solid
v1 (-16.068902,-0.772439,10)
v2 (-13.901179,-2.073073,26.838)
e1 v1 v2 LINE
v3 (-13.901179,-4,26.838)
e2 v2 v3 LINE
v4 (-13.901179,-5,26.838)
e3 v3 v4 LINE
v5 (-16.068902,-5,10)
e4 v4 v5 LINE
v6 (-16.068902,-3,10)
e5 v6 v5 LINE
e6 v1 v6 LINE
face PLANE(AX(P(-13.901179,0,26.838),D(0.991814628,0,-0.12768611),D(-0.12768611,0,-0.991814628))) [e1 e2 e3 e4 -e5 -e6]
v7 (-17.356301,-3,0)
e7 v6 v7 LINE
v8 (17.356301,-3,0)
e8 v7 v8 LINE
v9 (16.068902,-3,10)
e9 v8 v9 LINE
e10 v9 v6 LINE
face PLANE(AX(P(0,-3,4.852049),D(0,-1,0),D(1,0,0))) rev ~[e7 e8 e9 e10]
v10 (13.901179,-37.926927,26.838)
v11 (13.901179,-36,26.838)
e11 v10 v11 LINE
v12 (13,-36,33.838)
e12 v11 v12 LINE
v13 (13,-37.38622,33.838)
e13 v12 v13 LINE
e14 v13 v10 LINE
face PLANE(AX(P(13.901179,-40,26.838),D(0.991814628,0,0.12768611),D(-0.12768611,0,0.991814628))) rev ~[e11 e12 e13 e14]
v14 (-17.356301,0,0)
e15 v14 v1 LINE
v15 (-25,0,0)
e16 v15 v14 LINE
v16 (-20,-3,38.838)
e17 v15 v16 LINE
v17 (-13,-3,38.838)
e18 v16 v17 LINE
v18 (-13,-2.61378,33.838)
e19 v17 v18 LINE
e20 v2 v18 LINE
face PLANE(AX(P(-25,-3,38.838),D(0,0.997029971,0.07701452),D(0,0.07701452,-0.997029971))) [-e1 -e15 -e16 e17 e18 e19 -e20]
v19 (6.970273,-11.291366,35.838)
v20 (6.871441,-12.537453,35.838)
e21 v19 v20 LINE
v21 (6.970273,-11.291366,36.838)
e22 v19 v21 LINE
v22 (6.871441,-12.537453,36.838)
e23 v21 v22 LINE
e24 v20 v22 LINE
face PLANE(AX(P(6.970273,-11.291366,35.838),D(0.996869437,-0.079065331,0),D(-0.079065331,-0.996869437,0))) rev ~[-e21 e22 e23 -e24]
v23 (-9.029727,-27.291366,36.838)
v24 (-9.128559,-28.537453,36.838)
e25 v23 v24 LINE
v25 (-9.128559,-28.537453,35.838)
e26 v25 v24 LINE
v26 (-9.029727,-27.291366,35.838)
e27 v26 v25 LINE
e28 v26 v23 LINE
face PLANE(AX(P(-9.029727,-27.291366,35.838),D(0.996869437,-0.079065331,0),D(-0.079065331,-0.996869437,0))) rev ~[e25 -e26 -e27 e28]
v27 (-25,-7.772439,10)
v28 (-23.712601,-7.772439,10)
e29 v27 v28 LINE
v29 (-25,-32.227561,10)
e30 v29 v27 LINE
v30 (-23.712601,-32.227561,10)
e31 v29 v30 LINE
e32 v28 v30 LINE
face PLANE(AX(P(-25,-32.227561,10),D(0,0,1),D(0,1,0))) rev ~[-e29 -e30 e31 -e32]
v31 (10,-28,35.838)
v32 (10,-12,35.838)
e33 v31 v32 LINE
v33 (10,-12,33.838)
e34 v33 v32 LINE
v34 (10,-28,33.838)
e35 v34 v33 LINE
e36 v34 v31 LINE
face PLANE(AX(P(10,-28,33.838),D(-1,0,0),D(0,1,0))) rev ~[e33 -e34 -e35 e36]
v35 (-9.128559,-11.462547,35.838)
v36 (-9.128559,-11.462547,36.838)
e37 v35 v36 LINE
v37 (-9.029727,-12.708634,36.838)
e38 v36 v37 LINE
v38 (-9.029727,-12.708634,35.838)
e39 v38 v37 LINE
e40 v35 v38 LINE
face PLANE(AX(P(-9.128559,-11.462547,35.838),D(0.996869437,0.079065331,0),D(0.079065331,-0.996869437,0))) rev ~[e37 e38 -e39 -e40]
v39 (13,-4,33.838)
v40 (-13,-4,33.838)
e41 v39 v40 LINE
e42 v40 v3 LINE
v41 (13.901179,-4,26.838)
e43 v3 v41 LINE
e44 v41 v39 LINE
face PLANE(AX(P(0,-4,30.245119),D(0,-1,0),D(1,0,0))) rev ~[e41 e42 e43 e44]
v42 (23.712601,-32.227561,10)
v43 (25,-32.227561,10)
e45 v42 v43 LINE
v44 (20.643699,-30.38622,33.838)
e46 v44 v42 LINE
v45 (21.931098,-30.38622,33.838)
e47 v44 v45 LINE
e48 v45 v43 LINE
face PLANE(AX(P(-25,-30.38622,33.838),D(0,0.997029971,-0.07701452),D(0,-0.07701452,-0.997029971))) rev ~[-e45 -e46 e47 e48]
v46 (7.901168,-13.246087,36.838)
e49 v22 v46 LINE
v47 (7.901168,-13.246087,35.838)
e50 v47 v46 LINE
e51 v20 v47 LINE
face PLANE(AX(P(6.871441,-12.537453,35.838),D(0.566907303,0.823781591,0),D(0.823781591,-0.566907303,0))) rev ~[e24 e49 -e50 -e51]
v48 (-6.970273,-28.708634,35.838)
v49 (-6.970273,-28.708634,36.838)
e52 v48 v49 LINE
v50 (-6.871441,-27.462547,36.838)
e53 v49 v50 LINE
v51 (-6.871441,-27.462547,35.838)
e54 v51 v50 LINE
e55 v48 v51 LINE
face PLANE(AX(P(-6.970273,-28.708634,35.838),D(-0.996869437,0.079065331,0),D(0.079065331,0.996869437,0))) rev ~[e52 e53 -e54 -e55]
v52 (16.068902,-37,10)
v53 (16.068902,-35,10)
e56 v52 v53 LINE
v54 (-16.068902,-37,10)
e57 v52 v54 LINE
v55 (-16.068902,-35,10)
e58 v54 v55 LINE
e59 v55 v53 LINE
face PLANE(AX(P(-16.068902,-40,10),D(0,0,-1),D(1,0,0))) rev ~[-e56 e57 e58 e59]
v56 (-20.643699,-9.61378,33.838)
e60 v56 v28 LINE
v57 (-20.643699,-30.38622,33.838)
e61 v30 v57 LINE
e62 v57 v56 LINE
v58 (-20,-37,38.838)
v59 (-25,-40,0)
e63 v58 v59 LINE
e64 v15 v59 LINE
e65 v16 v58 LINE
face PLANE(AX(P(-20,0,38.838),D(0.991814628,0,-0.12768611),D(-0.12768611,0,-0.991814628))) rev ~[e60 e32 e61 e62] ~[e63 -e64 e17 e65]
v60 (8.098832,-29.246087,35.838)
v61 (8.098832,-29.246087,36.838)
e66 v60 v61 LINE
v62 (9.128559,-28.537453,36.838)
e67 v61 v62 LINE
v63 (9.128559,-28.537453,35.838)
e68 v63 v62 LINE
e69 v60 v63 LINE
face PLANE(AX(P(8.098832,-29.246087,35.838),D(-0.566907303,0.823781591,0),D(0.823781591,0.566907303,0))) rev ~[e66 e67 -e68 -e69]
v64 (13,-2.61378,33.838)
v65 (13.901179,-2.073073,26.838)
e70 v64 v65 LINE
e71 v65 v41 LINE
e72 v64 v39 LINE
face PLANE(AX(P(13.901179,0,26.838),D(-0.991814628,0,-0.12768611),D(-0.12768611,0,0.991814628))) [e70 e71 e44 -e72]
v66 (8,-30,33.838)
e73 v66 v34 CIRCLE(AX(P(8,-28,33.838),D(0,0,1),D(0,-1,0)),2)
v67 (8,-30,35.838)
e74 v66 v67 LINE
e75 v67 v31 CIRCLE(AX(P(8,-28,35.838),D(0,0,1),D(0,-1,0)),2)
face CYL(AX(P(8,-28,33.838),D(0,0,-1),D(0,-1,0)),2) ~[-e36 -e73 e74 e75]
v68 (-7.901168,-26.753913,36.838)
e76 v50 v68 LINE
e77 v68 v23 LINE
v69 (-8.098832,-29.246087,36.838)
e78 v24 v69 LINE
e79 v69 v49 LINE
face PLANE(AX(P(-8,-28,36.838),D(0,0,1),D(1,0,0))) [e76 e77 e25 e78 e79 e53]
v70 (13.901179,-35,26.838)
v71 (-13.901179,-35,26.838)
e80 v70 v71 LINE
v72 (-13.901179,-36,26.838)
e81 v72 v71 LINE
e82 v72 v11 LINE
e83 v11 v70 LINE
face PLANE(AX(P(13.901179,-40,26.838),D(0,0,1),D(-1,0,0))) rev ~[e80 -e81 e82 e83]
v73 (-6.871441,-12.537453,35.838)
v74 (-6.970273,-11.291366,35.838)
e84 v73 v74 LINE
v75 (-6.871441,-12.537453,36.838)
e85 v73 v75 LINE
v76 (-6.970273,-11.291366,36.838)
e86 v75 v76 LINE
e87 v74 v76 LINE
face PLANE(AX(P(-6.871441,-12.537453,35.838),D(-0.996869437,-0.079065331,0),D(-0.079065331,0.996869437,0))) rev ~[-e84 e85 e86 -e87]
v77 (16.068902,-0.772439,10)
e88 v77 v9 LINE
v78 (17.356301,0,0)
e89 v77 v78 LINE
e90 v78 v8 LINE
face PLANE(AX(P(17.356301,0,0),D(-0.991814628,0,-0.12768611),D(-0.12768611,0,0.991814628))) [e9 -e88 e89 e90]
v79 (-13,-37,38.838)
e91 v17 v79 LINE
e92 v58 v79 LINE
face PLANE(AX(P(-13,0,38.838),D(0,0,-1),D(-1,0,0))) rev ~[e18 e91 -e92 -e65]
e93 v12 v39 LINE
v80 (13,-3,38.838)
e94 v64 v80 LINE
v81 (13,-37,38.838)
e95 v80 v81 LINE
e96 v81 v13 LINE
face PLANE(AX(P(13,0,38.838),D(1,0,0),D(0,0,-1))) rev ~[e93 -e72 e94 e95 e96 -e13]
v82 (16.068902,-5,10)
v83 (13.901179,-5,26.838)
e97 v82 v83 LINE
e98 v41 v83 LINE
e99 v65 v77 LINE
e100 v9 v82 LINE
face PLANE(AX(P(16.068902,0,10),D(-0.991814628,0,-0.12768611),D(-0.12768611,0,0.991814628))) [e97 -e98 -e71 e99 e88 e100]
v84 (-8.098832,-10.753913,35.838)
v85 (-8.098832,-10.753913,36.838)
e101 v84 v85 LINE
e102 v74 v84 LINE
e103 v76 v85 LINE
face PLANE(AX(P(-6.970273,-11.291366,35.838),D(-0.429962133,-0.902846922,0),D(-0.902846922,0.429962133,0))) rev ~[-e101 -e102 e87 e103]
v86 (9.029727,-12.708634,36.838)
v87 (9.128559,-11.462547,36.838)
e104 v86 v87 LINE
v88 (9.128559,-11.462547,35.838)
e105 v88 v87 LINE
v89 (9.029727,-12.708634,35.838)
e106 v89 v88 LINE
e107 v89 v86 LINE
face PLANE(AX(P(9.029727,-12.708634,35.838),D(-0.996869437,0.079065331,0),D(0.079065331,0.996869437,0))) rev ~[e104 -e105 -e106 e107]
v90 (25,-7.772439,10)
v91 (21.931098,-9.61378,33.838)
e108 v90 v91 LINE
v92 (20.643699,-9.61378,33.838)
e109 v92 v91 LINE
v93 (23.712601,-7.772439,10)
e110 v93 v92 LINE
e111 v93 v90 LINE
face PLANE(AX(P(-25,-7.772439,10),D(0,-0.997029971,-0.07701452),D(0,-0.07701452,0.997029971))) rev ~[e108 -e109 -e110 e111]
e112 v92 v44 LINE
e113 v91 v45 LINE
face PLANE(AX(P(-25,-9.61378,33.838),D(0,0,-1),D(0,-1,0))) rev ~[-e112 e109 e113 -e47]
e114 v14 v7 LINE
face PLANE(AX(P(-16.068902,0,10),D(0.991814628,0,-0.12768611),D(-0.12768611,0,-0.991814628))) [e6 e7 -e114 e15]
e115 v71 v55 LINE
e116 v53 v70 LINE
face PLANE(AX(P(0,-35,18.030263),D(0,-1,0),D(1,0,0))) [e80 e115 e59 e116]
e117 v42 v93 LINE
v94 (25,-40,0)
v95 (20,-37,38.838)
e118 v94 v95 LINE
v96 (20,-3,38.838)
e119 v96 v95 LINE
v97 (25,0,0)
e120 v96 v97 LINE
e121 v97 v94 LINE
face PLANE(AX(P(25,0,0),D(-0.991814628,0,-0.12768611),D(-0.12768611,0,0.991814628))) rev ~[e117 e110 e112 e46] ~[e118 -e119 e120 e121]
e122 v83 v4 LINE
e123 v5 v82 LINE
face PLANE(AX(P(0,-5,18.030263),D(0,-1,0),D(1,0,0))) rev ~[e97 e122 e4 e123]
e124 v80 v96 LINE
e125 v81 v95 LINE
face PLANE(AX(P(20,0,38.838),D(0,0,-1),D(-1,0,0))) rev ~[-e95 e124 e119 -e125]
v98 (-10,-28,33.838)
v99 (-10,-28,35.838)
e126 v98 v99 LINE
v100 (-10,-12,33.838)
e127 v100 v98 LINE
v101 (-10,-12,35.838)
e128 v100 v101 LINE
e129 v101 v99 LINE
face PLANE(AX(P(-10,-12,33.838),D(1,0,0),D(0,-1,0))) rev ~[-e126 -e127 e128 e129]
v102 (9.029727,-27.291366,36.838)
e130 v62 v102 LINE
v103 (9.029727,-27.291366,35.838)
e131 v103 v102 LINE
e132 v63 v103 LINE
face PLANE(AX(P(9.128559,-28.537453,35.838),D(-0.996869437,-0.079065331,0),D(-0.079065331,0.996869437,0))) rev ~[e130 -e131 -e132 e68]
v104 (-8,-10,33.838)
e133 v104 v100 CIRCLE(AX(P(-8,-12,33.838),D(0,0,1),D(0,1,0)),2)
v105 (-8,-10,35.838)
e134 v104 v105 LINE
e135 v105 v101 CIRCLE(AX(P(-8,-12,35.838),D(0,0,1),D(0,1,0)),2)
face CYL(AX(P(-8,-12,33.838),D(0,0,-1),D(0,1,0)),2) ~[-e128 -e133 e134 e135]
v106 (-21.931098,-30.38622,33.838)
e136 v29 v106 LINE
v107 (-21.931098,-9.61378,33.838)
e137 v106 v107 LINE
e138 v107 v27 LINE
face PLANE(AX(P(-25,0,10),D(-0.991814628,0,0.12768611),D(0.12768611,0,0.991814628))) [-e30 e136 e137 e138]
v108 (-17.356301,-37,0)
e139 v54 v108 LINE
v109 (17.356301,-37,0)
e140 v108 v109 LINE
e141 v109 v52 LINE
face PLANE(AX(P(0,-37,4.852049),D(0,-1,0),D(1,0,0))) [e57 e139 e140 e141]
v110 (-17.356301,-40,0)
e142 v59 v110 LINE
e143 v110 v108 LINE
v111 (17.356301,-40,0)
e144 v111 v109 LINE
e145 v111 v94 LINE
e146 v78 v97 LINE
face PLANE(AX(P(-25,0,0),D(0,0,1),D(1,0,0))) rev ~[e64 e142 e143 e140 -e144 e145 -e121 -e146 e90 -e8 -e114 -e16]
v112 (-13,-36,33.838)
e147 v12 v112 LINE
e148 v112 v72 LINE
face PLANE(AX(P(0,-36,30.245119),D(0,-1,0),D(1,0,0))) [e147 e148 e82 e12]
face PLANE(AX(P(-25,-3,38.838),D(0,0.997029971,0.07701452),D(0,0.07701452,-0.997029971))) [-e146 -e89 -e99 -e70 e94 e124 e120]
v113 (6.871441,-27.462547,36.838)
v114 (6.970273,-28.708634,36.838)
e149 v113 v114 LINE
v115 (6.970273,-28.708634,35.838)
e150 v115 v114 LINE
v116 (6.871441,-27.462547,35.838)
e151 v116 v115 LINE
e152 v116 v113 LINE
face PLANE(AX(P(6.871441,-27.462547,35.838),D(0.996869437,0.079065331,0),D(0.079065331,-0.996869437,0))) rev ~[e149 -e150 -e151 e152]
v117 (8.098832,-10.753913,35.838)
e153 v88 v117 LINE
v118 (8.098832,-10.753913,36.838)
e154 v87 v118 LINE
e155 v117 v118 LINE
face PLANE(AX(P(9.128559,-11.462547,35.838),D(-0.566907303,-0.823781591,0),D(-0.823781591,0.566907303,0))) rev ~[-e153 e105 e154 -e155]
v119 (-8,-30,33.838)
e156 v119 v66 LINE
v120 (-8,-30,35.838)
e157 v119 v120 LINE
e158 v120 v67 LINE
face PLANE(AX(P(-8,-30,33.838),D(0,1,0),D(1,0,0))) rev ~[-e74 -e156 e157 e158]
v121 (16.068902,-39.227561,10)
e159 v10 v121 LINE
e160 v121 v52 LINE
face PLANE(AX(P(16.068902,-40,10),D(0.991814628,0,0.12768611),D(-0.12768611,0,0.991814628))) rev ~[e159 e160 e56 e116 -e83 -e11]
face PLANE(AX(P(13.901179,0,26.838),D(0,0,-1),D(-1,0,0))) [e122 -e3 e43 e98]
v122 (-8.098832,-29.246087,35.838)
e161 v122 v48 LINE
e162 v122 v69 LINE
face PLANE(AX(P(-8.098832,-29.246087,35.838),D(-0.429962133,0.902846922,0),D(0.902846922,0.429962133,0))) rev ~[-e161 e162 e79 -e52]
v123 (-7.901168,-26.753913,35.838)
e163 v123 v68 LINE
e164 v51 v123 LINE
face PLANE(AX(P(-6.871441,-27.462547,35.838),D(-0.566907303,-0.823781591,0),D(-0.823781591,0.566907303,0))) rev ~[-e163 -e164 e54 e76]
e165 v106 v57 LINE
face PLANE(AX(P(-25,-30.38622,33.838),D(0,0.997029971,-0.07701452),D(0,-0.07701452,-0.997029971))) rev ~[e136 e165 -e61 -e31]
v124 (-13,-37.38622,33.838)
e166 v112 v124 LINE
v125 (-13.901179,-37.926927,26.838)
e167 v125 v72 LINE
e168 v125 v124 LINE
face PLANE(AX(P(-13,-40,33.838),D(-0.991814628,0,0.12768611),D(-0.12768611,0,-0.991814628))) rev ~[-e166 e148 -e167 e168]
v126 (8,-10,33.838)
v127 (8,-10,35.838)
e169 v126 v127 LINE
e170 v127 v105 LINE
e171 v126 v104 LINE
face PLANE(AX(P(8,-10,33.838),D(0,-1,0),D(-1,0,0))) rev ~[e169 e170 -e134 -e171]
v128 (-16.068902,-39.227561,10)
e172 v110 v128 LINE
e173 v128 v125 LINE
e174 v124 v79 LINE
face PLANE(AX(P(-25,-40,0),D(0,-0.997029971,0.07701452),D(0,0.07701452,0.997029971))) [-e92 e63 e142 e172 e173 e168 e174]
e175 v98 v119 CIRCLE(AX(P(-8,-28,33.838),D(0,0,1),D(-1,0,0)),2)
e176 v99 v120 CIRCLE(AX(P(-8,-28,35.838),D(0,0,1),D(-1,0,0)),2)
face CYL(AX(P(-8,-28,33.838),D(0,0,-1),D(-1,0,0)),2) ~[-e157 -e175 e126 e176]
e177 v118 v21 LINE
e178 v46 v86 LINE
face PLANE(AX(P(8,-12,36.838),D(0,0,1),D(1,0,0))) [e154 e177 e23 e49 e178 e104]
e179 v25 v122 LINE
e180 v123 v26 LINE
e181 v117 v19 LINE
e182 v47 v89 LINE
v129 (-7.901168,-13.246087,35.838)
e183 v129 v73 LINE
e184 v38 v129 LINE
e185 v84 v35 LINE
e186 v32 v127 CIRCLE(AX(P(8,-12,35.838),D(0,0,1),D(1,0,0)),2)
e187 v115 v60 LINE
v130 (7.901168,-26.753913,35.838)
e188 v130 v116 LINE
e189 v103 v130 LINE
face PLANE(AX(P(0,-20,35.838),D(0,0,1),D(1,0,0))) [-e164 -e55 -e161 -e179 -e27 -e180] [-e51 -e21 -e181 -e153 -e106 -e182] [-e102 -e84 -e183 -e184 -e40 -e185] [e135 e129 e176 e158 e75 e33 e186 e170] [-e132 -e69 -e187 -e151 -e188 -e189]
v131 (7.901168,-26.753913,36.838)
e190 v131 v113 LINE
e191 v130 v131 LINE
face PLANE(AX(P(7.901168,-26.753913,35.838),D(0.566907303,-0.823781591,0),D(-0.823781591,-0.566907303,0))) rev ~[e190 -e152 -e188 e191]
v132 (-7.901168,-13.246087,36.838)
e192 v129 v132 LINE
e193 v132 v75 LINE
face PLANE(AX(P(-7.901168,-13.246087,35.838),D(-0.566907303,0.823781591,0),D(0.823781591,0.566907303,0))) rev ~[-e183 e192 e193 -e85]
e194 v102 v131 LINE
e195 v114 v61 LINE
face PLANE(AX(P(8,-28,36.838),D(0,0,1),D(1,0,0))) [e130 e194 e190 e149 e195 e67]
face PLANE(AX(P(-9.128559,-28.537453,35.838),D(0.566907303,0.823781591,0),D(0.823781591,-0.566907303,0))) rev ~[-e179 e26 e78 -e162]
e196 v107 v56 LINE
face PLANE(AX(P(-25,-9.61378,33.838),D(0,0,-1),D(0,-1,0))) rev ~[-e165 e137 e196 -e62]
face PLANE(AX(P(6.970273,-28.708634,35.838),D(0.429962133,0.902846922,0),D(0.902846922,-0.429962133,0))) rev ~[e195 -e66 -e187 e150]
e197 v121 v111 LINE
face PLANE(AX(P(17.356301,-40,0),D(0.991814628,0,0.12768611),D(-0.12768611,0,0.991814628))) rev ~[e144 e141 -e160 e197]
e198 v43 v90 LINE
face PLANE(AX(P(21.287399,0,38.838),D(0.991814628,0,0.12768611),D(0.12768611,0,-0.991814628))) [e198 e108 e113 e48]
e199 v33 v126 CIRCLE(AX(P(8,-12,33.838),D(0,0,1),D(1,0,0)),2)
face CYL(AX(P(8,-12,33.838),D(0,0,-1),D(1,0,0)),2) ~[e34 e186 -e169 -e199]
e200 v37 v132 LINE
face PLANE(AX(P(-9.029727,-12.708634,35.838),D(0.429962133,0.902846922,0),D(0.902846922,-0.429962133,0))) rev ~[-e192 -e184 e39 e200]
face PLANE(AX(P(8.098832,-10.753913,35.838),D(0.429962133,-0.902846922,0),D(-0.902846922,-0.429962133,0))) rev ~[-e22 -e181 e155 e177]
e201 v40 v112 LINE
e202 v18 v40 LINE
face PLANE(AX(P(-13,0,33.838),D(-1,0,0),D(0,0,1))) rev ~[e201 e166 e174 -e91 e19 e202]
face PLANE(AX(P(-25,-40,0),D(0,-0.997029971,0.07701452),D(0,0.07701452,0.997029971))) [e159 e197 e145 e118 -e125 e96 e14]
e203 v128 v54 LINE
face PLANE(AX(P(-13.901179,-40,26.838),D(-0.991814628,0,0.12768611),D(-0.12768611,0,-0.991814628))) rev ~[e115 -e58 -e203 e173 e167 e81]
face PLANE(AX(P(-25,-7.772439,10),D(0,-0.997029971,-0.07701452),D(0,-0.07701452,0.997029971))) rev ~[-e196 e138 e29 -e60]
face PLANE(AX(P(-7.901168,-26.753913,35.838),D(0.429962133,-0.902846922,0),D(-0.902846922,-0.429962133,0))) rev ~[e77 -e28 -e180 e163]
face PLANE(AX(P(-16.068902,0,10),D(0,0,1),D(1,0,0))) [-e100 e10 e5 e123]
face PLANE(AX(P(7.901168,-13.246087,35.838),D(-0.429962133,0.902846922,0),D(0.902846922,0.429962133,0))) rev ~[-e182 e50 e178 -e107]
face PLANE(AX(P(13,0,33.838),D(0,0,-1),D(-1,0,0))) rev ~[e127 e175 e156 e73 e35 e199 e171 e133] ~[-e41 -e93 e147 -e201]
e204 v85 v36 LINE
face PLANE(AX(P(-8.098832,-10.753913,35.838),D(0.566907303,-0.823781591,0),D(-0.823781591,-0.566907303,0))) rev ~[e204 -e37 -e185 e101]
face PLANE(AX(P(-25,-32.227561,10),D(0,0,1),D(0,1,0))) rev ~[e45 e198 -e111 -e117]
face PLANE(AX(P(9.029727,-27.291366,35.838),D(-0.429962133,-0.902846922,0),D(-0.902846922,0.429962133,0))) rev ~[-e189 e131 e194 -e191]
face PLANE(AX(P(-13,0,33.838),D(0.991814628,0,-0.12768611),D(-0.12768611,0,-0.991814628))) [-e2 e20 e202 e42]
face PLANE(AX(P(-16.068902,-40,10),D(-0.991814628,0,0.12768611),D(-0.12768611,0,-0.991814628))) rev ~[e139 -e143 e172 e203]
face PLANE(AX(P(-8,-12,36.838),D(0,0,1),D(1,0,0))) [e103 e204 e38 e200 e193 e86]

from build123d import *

# Parameters (mm, degrees)
F1_DEPTH  = 40
F2_DEPTH  = 4
F3_DEPTH  = 3
F4_DEPTH  = 5
F6_DEPTH  = 4
F7_DEPTH  = 3
F8_DEPTH  = 5
F10_DEPTH = 2
F13_DEPTH = 50
F15_DEPTH = 1
F16_DEPTH = 50
F17_DEPTH = 40


# Not quite as in the source:
# - ends of sketch curves that miss each other by under 0.0002 mm in the source are joined


with BuildPart() as f1:
    # F0 (on Front) → F1 (new body)
    with BuildSketch(Plane.XZ):
        Polygon((-20, 38.838), (-25, 0), (-17.3563005304, 0), (-16.0689015912, 10), (-13.9011792574, 26.838), (-13, 33.838), (-13, 38.838), align=None)
        Polygon((-16.0689015912, 10), (-17.3563005304, 0), (17.3563005304, 0), (16.0689015912, 10), (0, 10), align=None)
        Polygon((-13.9011792574, 26.838), (-16.0689015912, 10), (0, 10), (16.0689015912, 10), (13.9011792574, 26.838), (-3.37943e-05, 26.838), align=None)
        Polygon((-13, 33.838), (-13.9011792574, 26.838), (3.37943e-05, 26.838), (13.9011792574, 26.838), (13, 33.838), (0, 33.838), align=None)
        Polygon((16.0689015912, 10), (17.3563005304, 0), (25, 0), (20, 38.838), (13, 38.838), (13, 33.838), (13.9011792574, 26.838), align=None)
    extrude(amount=F1_DEPTH)

    # F0 (on Front) → F2 (cut)
    with BuildSketch(Plane.XZ):
        Polygon((-13, 33.838), (-13.9011792574, 26.838), (3.37943e-05, 26.838), (13.9011792574, 26.838), (13, 33.838), (0, 33.838), align=None)
    extrude(amount=F2_DEPTH, mode=Mode.SUBTRACT)

    # F0 (on Front) → F3 (cut)
    with BuildSketch(Plane.XZ):
        Polygon((-16.0689015912, 10), (-17.3563005304, 0), (17.3563005304, 0), (16.0689015912, 10), (0, 10), align=None)
    extrude(amount=F3_DEPTH, mode=Mode.SUBTRACT)

    # F0 (on Front) → F4 (cut)
    with BuildSketch(Plane.XZ):
        Polygon((-13.9011792574, 26.838), (-16.0689015912, 10), (0, 10), (16.0689015912, 10), (13.9011792574, 26.838), (-3.37943e-05, 26.838), align=None)
    extrude(amount=F4_DEPTH, mode=Mode.SUBTRACT)

    # F5 (on face) → F6 (cut)
    with BuildSketch(Plane.XZ.offset(40)):
        Polygon((-13, 33.838), (-13.9011792574, 26.838), (3.37943e-05, 26.838), (13.9011792574, 26.838), (13, 33.838), (0, 33.838), align=None)
    extrude(amount=-F6_DEPTH, mode=Mode.SUBTRACT)

    # F5 (on face) → F7 (cut)
    with BuildSketch(Plane.XZ.offset(40)):
        Polygon((-16.0689015912, 10), (-17.3563005304, 0), (17.3563005304, 0), (16.0689015912, 10), (0, 10), align=None)
    extrude(amount=-F7_DEPTH, mode=Mode.SUBTRACT)

    # F5 (on face) → F8 (cut)
    with BuildSketch(Plane.XZ.offset(40)):
        Polygon((-13.9011792574, 26.838), (-16.0689015912, 10), (0, 10), (16.0689015912, 10), (13.9011792574, 26.838), (-3.37943e-05, 26.838), align=None)
    extrude(amount=-F8_DEPTH, mode=Mode.SUBTRACT)

    # F9 (on face) → F10 (join)
    with BuildSketch(Plane.XY.offset(33.838)):
        with BuildLine():
            ThreePointArc((-10, -28), (-9.4142135624, -29.4142135624), (-8, -30))
            Line((-8, -30), (8, -30))
            ThreePointArc((8, -30), (9.4142135624, -29.4142135624), (10, -28))
            Line((10, -28), (10, -12))
            ThreePointArc((10, -12), (9.4142135624, -10.5857864376), (8, -10))
            Line((8, -10), (-8, -10))
            ThreePointArc((-8, -10), (-9.4142135624, -10.5857864376), (-10, -12))
            Line((-10, -12), (-10, -28))
        make_face()
    extrude(amount=F10_DEPTH)

    # F12 (on face) → F13 (cut)
    with BuildSketch(Plane.YZ.offset(-25)):
        Polygon((-3, 38.838), (0, 0), (0, 38.838), align=None)
        Polygon((-40, 38.838), (-40, 0), (-37, 38.838), align=None)
    extrude(amount=F13_DEPTH, mode=Mode.SUBTRACT)

    # F14 (on face) → F15 (join)
    with BuildSketch(Plane.XY.offset(35.838)):
        Polygon((-7.9011683363, -13.2460867956), (-6.8714413478, -12.5374526663), (-6.9702730115, -11.2913658707), (-8.0988316637, -10.7539132044), (-9.1285586522, -11.4625473337), (-9.0297269885, -12.7086341293), align=None)
        Polygon((6.9702730115, -11.2913658707), (6.8714413478, -12.5374526663), (7.9011683363, -13.2460867956), (9.0297269885, -12.7086341293), (9.1285586522, -11.4625473337), (8.0988316637, -10.7539132044), align=None)
        Polygon((7.9011683363, -26.7539132044), (6.8714413478, -27.4625473337), (6.9702730115, -28.7086341293), (8.0988316637, -29.2460867956), (9.1285586522, -28.5374526663), (9.0297269885, -27.2913658707), align=None)
        Polygon((-6.9702730115, -28.7086341293), (-6.8714413478, -27.4625473337), (-7.9011683363, -26.7539132044), (-9.0297269885, -27.2913658707), (-9.1285586522, -28.5374526663), (-8.0988316637, -29.2460867956), align=None)
    extrude(amount=F15_DEPTH)

    # F12 (on face) → F16 (join)
    with BuildSketch(Plane.YZ.offset(-25)):
        Polygon((-20, 33.838), (-30.3862196818, 33.838), (-32.2275606365, 10), (-20, 10), (-7.7724393635, 10), (-9.6137803182, 33.838), align=None)
    extrude(amount=F16_DEPTH)

    # F0 (on Front) → F17 (cut)
    with BuildSketch(Plane.XZ):
        Polygon((-25, 38.838), (-25, 10), (-21.2873989392, 38.838), align=None)
        Polygon((21.2873989392, 38.838), (25, 10), (25, 38.838), align=None)
    extrude(amount=F17_DEPTH, mode=Mode.SUBTRACT)


solid = f1.part
